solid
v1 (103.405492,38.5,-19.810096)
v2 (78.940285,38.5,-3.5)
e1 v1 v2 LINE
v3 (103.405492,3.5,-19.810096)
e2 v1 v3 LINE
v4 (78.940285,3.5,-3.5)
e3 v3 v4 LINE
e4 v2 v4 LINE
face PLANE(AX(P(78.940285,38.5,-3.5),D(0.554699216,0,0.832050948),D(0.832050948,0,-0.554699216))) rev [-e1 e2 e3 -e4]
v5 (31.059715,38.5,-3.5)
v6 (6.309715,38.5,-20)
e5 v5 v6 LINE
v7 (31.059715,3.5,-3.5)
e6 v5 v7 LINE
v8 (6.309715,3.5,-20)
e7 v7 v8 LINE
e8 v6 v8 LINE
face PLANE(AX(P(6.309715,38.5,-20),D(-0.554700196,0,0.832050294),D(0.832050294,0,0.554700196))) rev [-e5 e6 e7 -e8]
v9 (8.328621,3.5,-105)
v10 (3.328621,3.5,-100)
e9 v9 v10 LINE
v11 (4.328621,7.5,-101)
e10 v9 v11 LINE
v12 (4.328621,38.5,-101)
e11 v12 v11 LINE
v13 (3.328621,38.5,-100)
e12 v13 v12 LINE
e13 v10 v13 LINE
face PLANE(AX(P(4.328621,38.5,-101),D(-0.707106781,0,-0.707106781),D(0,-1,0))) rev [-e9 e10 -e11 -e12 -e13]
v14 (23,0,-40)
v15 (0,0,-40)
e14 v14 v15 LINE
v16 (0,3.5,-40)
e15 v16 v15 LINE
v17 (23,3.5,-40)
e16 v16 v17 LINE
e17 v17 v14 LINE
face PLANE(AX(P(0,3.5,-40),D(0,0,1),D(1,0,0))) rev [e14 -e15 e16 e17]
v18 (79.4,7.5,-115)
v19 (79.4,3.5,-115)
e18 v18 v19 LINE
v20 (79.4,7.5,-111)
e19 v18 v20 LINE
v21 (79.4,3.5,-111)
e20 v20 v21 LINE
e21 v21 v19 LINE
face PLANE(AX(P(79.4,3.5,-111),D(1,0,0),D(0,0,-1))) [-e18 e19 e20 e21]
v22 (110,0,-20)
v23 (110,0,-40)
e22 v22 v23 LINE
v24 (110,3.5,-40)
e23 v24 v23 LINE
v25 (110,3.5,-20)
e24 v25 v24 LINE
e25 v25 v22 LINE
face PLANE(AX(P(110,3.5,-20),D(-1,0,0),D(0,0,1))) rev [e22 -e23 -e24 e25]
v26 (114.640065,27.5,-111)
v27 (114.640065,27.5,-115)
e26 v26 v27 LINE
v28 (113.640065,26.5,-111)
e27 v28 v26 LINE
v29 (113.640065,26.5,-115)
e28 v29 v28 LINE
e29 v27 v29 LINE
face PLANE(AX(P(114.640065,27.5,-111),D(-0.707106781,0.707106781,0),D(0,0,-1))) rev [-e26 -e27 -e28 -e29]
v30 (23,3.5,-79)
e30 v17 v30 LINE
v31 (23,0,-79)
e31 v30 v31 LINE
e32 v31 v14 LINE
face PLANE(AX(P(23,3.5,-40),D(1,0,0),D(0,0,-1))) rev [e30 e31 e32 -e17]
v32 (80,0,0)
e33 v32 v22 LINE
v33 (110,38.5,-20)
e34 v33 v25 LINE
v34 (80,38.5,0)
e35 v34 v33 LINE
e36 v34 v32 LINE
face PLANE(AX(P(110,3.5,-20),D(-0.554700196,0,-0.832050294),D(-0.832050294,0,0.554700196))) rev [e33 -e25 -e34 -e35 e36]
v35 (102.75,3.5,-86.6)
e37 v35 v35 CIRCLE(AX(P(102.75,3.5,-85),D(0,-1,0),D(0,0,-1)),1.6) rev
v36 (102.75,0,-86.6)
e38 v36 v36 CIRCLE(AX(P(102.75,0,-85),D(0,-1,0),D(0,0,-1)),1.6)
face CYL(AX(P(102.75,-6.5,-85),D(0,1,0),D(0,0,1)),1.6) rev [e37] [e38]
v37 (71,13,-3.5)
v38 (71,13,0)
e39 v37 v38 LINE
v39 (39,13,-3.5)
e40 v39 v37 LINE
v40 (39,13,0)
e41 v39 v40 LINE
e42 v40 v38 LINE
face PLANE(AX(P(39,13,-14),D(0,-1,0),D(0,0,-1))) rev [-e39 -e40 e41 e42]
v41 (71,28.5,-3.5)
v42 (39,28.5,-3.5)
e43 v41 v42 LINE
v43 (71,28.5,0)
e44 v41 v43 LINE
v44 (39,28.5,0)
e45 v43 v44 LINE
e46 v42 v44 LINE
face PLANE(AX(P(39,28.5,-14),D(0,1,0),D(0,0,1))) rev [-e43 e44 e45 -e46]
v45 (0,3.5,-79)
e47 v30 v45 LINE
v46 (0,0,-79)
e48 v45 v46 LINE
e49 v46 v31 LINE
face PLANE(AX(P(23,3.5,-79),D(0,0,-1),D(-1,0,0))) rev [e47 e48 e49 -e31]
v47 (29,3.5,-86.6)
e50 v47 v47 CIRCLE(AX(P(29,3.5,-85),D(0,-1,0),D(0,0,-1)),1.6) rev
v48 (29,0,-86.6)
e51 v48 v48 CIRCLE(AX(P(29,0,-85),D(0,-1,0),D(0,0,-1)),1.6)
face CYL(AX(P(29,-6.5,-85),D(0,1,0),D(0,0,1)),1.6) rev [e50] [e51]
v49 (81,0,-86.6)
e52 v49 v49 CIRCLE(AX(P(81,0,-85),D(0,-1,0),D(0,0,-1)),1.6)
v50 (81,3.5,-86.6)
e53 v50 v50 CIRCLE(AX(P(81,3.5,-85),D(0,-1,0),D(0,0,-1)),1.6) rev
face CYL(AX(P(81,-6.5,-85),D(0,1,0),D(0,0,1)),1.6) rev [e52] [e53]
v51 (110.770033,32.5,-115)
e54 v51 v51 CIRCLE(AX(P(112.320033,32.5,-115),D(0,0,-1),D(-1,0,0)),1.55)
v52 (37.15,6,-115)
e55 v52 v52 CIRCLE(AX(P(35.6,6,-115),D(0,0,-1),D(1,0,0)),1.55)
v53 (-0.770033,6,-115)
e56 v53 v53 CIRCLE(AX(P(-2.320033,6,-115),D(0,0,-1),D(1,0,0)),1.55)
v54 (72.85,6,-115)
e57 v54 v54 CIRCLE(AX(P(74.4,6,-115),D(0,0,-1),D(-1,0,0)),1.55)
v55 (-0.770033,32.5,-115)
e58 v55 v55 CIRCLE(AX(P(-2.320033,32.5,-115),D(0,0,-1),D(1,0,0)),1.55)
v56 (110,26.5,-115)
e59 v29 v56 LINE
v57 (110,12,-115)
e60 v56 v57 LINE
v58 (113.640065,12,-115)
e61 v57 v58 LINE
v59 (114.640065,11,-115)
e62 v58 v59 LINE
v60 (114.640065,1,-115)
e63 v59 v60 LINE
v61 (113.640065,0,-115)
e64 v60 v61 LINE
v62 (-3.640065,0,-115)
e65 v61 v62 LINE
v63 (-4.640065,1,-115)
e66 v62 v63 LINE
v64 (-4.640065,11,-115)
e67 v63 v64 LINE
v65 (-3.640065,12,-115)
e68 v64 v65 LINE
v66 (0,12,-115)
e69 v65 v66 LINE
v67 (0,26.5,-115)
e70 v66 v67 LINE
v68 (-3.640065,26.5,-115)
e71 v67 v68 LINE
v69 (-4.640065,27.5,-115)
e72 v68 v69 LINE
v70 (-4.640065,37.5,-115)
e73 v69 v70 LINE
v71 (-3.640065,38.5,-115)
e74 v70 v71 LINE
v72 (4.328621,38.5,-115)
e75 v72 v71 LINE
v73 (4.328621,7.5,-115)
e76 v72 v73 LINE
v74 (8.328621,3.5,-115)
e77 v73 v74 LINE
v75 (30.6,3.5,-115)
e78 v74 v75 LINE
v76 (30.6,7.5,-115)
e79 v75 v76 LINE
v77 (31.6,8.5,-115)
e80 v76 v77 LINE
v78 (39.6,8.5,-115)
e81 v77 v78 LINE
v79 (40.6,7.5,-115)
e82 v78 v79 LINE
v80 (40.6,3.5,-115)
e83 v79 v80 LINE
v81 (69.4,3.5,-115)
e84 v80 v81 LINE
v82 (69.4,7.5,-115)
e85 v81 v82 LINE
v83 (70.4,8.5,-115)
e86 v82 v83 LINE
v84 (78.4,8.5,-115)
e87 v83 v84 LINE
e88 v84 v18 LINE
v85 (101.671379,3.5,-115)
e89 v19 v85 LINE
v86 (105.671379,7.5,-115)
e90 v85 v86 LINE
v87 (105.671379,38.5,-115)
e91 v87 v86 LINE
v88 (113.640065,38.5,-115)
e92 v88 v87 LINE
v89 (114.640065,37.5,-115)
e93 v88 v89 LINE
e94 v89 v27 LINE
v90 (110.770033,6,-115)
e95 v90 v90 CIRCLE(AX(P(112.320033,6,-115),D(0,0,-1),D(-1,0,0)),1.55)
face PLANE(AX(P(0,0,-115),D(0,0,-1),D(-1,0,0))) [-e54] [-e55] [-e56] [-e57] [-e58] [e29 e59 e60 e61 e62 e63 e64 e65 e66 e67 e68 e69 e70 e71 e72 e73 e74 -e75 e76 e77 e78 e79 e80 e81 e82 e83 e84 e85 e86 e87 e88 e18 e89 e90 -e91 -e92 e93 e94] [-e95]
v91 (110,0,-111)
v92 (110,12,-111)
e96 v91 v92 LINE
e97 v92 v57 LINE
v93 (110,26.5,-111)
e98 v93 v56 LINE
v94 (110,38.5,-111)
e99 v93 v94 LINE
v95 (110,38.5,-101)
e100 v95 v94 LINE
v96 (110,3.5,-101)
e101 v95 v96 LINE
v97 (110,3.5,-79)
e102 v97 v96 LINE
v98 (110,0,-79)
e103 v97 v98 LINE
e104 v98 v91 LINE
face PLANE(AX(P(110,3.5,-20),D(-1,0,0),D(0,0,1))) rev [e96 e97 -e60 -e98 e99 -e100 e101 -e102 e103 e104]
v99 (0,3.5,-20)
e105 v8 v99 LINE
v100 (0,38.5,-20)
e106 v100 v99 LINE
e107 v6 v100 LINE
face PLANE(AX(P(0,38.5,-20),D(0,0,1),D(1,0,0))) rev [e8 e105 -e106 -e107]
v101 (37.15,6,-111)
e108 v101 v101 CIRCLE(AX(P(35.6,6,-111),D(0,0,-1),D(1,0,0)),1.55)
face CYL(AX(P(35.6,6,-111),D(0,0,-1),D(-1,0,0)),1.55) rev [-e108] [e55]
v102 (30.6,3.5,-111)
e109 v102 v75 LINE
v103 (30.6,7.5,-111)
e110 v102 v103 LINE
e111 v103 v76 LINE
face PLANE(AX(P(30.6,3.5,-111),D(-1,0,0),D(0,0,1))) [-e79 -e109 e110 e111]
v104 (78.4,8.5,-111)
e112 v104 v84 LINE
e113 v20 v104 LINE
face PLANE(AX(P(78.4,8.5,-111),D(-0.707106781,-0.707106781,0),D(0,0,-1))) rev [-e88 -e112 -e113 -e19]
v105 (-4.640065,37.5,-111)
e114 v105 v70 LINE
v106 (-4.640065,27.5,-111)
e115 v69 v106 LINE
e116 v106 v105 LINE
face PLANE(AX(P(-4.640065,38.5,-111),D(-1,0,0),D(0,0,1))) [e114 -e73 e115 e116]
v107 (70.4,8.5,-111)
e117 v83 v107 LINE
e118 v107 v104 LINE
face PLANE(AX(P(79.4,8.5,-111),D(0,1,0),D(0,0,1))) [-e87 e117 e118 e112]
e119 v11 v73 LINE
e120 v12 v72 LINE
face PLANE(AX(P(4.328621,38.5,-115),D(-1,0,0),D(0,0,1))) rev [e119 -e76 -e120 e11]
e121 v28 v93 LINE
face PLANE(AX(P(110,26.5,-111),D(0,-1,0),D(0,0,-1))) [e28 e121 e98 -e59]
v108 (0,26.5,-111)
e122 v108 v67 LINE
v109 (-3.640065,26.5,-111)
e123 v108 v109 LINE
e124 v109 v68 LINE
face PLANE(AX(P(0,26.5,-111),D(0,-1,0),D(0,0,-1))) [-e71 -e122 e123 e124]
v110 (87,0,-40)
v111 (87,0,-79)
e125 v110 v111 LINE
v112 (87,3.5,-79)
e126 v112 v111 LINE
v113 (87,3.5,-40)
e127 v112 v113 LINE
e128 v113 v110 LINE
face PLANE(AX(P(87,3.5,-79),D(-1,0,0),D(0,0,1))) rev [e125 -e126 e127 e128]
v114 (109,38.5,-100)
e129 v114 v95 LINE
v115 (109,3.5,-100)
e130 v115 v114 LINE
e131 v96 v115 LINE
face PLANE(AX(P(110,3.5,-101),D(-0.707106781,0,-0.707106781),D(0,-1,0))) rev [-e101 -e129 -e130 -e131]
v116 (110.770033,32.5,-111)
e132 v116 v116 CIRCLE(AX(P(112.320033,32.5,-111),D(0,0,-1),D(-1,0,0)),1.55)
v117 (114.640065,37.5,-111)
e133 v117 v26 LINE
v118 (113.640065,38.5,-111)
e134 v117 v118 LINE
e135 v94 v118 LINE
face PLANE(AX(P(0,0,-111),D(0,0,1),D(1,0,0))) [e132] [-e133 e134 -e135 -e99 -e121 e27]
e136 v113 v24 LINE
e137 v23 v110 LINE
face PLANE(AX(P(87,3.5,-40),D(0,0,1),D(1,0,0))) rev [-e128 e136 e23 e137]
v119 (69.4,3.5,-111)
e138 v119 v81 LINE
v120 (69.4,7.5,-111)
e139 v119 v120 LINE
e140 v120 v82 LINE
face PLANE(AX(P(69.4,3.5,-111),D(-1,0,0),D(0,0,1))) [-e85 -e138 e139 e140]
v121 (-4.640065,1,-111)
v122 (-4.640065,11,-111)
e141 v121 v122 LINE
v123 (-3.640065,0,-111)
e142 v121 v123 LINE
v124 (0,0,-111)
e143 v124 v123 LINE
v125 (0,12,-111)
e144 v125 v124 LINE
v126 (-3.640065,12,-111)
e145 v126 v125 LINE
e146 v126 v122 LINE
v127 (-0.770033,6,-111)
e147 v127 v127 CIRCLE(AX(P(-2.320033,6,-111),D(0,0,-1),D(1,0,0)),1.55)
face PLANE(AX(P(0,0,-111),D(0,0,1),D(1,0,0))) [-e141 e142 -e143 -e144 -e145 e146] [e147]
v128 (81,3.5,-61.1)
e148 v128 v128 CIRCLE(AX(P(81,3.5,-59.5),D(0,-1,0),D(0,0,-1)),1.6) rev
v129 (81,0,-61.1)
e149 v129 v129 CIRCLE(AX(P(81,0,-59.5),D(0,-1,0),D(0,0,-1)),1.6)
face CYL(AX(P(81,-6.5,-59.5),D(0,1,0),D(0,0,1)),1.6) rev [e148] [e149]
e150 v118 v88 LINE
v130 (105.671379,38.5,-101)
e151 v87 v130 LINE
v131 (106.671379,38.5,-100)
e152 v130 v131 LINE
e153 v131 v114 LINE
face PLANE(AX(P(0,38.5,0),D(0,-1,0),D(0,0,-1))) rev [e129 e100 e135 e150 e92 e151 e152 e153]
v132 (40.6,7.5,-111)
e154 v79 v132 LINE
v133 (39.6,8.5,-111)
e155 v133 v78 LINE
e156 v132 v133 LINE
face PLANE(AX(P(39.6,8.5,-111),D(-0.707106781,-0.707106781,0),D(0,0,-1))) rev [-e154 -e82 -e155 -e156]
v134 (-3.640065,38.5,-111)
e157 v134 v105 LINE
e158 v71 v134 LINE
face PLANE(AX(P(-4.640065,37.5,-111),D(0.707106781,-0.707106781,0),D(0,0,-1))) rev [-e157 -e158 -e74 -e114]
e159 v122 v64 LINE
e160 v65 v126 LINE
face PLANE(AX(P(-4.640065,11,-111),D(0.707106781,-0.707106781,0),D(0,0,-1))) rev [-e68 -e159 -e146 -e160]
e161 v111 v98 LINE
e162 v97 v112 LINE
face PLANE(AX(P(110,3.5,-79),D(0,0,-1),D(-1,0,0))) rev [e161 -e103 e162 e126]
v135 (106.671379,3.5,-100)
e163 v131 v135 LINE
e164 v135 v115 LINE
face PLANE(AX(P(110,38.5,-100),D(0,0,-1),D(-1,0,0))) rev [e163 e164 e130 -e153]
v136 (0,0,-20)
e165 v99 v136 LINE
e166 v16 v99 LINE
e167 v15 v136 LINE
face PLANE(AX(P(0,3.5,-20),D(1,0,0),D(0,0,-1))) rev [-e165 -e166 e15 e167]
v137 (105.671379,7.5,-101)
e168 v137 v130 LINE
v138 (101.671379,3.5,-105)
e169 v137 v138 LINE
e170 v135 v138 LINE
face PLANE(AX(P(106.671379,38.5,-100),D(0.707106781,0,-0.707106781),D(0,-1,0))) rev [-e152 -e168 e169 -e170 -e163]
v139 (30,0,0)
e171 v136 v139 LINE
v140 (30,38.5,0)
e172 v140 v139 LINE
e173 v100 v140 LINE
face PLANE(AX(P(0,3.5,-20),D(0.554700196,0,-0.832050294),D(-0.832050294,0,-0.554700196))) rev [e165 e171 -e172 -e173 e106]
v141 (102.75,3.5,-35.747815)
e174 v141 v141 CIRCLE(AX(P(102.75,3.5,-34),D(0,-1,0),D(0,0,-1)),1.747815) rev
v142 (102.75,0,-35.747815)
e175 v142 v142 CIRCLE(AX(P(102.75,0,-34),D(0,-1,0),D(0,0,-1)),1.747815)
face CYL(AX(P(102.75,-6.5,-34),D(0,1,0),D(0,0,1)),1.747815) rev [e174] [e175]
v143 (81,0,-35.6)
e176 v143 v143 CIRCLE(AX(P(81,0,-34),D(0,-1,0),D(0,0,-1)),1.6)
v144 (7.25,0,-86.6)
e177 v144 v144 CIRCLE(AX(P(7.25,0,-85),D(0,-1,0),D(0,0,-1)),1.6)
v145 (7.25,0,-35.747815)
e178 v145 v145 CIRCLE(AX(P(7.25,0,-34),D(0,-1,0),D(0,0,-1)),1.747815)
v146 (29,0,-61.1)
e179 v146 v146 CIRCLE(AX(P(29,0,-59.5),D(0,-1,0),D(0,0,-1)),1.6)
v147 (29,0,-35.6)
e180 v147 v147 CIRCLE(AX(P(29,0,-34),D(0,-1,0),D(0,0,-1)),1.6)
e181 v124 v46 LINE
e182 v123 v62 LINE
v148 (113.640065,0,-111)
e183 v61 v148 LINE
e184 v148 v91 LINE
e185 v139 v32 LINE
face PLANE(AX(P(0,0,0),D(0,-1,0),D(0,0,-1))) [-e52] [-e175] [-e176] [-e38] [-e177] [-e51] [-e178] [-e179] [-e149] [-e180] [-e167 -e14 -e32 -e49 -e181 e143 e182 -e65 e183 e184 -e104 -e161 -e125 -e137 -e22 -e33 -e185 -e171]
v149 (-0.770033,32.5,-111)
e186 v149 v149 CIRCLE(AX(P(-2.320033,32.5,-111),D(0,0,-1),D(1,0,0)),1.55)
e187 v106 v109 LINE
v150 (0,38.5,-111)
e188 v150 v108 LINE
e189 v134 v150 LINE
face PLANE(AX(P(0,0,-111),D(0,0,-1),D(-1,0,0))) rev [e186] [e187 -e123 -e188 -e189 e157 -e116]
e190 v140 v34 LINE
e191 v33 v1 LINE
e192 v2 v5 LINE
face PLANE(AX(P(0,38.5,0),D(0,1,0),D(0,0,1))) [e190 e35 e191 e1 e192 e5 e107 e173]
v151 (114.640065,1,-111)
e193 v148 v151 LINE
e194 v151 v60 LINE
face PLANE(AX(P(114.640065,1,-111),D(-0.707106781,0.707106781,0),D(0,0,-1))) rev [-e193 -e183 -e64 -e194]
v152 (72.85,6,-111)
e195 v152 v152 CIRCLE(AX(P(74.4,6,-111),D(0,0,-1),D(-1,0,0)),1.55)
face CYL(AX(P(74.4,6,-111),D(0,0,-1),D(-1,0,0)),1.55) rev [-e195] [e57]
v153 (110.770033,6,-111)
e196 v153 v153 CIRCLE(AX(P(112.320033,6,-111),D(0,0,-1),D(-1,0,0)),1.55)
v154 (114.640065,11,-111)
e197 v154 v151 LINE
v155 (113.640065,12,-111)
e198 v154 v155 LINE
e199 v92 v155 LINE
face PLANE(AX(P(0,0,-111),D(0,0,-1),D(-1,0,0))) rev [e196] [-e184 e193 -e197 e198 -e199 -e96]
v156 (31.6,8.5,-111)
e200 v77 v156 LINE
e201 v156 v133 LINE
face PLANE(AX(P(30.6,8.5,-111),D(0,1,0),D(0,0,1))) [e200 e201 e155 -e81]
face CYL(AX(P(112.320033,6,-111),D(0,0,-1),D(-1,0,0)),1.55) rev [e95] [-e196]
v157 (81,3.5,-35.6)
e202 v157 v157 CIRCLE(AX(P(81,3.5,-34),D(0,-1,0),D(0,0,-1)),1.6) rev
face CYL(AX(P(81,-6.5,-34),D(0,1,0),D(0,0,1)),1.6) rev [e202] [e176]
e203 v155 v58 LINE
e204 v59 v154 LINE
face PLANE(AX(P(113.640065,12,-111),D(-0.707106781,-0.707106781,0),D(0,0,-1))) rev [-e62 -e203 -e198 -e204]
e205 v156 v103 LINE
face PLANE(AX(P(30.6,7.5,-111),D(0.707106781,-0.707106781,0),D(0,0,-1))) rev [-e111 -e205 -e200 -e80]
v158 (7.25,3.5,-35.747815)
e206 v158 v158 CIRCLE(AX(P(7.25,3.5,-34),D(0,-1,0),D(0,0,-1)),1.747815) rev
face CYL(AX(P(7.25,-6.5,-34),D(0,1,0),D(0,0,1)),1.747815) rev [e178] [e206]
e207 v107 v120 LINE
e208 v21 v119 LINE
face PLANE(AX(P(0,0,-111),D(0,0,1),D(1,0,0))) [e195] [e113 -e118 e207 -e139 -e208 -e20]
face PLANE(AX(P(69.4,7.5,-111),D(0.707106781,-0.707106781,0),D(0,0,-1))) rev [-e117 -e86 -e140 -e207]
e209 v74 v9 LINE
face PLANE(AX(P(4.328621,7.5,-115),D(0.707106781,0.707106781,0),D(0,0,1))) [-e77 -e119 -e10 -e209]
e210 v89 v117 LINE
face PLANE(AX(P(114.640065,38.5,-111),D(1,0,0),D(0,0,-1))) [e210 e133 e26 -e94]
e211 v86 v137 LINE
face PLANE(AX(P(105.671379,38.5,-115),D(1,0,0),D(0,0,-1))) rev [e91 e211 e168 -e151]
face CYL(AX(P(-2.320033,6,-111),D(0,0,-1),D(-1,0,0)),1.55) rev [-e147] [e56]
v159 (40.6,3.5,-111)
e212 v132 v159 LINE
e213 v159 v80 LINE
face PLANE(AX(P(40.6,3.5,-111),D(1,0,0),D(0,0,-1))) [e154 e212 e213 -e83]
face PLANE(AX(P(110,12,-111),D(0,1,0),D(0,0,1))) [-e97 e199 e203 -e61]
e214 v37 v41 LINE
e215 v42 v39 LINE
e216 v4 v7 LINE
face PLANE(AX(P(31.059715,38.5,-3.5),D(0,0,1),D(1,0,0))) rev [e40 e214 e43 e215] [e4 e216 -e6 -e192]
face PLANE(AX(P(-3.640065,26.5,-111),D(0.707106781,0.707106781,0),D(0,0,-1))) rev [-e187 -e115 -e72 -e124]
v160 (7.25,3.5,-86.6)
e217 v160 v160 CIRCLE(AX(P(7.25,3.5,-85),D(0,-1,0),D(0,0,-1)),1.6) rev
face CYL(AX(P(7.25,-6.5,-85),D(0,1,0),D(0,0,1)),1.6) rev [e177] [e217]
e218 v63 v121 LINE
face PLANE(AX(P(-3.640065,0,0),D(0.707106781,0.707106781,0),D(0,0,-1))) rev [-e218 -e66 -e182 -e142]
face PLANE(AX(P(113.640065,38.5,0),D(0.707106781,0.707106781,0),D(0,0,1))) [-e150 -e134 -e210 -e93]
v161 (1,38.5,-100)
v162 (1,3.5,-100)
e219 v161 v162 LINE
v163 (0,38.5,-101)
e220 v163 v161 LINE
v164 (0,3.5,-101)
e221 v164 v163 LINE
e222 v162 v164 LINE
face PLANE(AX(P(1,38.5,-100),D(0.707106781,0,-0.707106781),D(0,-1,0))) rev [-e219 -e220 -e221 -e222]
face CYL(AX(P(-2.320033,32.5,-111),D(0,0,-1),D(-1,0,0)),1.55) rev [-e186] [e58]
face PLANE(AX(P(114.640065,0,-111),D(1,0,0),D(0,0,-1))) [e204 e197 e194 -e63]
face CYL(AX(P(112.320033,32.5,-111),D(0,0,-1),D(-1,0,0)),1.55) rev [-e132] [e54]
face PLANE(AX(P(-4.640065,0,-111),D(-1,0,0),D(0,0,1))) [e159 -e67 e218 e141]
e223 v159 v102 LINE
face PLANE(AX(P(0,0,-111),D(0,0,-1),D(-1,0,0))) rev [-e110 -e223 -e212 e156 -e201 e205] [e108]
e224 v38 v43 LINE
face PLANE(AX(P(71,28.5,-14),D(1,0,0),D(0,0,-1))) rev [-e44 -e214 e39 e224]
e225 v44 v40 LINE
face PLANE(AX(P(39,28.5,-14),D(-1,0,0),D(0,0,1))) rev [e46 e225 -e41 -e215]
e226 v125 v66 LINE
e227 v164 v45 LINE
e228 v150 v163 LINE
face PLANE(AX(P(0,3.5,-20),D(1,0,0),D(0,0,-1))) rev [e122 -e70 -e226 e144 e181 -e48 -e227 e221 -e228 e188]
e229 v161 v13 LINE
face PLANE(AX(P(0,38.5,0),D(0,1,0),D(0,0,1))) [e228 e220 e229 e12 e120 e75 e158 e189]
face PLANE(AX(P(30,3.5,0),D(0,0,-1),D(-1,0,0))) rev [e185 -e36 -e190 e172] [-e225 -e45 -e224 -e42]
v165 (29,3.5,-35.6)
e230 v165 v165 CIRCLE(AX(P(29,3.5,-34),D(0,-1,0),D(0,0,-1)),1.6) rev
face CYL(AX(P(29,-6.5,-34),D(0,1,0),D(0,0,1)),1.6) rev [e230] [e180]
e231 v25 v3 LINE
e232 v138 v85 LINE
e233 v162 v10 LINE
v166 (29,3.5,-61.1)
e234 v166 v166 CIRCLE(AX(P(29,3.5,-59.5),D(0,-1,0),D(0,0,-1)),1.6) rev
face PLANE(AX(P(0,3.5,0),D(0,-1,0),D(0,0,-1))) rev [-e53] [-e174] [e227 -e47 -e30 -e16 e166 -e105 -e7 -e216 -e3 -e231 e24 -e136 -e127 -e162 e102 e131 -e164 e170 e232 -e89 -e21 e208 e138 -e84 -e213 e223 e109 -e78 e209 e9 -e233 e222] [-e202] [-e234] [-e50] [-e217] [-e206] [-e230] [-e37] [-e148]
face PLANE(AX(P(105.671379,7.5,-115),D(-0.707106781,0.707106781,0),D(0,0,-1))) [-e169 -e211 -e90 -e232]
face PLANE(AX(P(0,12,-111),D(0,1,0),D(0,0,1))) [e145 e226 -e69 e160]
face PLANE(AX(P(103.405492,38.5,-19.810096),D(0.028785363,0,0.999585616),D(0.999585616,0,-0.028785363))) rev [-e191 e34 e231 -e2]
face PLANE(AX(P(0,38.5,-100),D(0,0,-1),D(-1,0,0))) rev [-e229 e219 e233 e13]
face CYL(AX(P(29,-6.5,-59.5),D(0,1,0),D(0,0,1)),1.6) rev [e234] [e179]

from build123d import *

# Parameters (mm, degrees)
BOSS_EXTRUDE1_DEPTH  = 3.5
BOSS_EXTRUDE2_DEPTH  = 21
SKETCH3_W            = 23
SKETCH3_H            = 39
BOSS_EXTRUDE3_DEPTH  = 2.5
SKETCH5_W            = 21.5
SKETCH5_H            = 25
SKETCH5_W_2          = 7.07
SKETCH5_H_2          = 19.04
BOSS_EXTRUDE5_DEPTH  = 2.5
SKETCH6_W            = 7.07
SKETCH6_H            = 5.9
BOSS_EXTRUDE6_DEPTH  = 20
BOSS_EXTRUDE7_DEPTH  = 23
FILLET1_SIZE         = 10
SKETCH9_R            = 2.475
BOSS_EXTRUDE8_DEPTH  = 9
FILLET2_R            = 0.5
SKETCH10_R           = 1.65
CUT_EXTRUDE1_DEPTH   = 9
SKETCH11_W           = 0.2
SKETCH11_H           = 20
CUT_EXTRUDE2_DEPTH   = 9
CUT_EXTRUDE3_DEPTH   = 9
FILLET3_SIZE         = 3
BOSS_EXTRUDE9_DEPTH  = 5
SKETCH14_R           = 1.747814763
SKETCH14_R_2         = 1.6
CUT_EXTRUDE4_DEPTH   = 15
BOSS_EXTRUDE10_DEPTH = 35
SKETCH17_W           = 110
SKETCH17_H           = 3.5
BOSS_EXTRUDE11_DEPTH = 15
SKETCH18_W           = 161.485932181
SKETCH18_H           = 44
CUT_EXTRUDE5_DEPTH   = 63
SKETCH19_W           = 4.328620931
SKETCH19_H           = 15
BOSS_EXTRUDE12_DEPTH = 35
FILLET4_SIZE         = 1
SKETCH20_W           = 4.640065176
SKETCH20_H           = 12
SKETCH20_R           = 1.55
SKETCH20_W_2         = 10
SKETCH20_H_2         = 5
BOSS_EXTRUDE13_DEPTH = 4
SKETCH21_W           = 32
SKETCH21_H           = 15.5
CUT_EXTRUDE6_DEPTH   = 14
FILLET5_SIZE         = 1
FILLET6_SIZE         = 4


with BuildPart() as part:
    # Sketch1 → Boss-Extrude1 (new body)
    with BuildSketch(Plane(origin=(0, 0, 0), x_dir=(1, 0, 0), z_dir=(0, 1, 0))):
        Polygon((0, 40), (23, 40), (23, 79), (0, 79), (0, 100), (110, 100), (110, 79), (87, 79), (87, 40), (110, 40), (110, 20), (80, 0), (30, 0), (0, 20), align=None)
    extrude(amount=BOSS_EXTRUDE1_DEPTH)

    # Sketch2 → Boss-Extrude2 (add)
    with BuildSketch(Plane(origin=(0, 3.5, 0), x_dir=(1, 0, 0), z_dir=(0, 1, 0))):
        Polygon((0, 79), (23, 79), (23, 40), (0, 40), (0, 37.5), (25.5, 37.5), (25.5, 81.5), (0, 81.5), align=None)
        Polygon((110, 81.5), (84.5, 81.5), (84.5, 37.5), (110, 37.5), (110, 40), (87, 40), (87, 79), (110, 79), align=None)
    extrude(amount=BOSS_EXTRUDE2_DEPTH)

    # Sketch3 → Boss-Extrude3 (add)
    with BuildSketch(Plane(origin=(0, 24.5, 0), x_dir=(1, 0, 0), z_dir=(0, 1, 0))):
        with Locations((11.5, 59.5)):
            Rectangle(SKETCH3_W, SKETCH3_H)
        with Locations((98.5, 59.5)):
            Rectangle(SKETCH3_W, SKETCH3_H)
    extrude(amount=-BOSS_EXTRUDE3_DEPTH)

    # Sketch5 → Boss-Extrude5 (add)
    with BuildSketch(Plane(origin=(0, 24.5, 0), x_dir=(1, 0, 0), z_dir=(0, 1, 0))):
        with Locations((120.75, 50)):
            Rectangle(SKETCH5_W, SKETCH5_H)
        with Locations((-10.75, 50)):
            Rectangle(SKETCH5_W, SKETCH5_H)
        with Locations((29.035, 47.02)):
            Rectangle(SKETCH5_W_2, SKETCH5_H_2)
        with Locations((80.965, 47.02)):
            Rectangle(SKETCH5_W_2, SKETCH5_H_2)
    extrude(amount=-BOSS_EXTRUDE5_DEPTH)

    # Sketch6 → Boss-Extrude6 (add)
    with BuildSketch(Plane(origin=(0, 24.5, 0), x_dir=(1, 0, 0), z_dir=(0, 1, 0))):
        with Locations((29.035, 53.59)):
            Rectangle(SKETCH6_W, SKETCH6_H)
        with Locations((80.965, 53.59)):
            Rectangle(SKETCH6_W, SKETCH6_H)
        with Locations((-17.965, 53.59)):
            Rectangle(SKETCH6_W, SKETCH6_H)
        with Locations((127.965, 53.59)):
            Rectangle(SKETCH6_W, SKETCH6_H)
    extrude(amount=BOSS_EXTRUDE6_DEPTH)

    # Sketch7 → Boss-Extrude7 (add)
    with BuildSketch(Plane(origin=(0, 24.5, 0), x_dir=(1, 0, 0), z_dir=(0, 1, 0))):
        Polygon((0, 81.5), (25.5, 81.5), (25.5, 79), (0, 79), (-21.5, 79), (-21.5, 81.5), align=None)
        Polygon((110, 79), (84.5, 79), (84.5, 81.5), (110, 81.5), (131.5, 81.5), (131.5, 79), align=None)
    extrude(amount=BOSS_EXTRUDE7_DEPTH)

    # Fillet1
    # the kernel refuses this chamfer: 10 mm, written as the material it adds along each edge
    with BuildSketch(Plane(origin=(0, 22, -40), x_dir=(0.027495876610586372, -0.9996219169112968, 0), z_dir=(0, 0, 1)), Plane(origin=(110, 22, -37.5), x_dir=(-0.027495876610586317, -0.9996219169112968, 0), z_dir=(0, 0, -1)), Plane(origin=(110, 24.5, -81.5), x_dir=(0.9996219169112968, 0.027495876610586317, 0), z_dir=(0, 0, 1))) as fillet1_piece_1:
        Polygon((FILLET1_SIZE * 0.999621916911, -FILLET1_SIZE * 0.0274958766106), (-FILLET1_SIZE * 0.0274958766106, -FILLET1_SIZE * 0.999621916911), (0, 0), align=None)
    extrude(amount=2.5)
    with BuildSketch(Plane(origin=(0, 24.5, -79), x_dir=(0.027495876610586372, -0.9996219169112968, 0), z_dir=(0, 0, -1))) as fillet1_piece_2:
        Polygon((FILLET1_SIZE * 0.999621916911, FILLET1_SIZE * 0.0274958766106), (-FILLET1_SIZE * 0.0274958766106, FILLET1_SIZE * 0.999621916911), (0, 0), align=None)
    extrude(amount=2.5)

    # Sketch9 → Boss-Extrude8 (add)
    with BuildSketch(Plane(origin=(0, 0, -81.5), x_dir=(-1, 0, 0), z_dir=(0, 0, -1))):
        with Locations(Location((-114.55, 34.35, 0), (0, 0, 180))):
            Circle(SKETCH9_R)
        with Locations(Location((4.55, 34.35, 0), (0, 0, 180))):
            Circle(SKETCH9_R)
    extrude(amount=BOSS_EXTRUDE8_DEPTH)

    # Fillet2
    fillet2_edges = [part.edges().sort_by_distance(p)[0] for p in [
        (112.075, 34.35, -90.5),
        (-7.025, 34.35, -90.5),
    ]]
    fillet(fillet2_edges, radius=FILLET2_R)

    # Sketch10 → Cut-Extrude1 (cut)
    with BuildSketch(Plane.XY.offset(-50.64)):
        with Locations((129.16, 39.27)):
            Circle(SKETCH10_R)
        with Locations((129.16, 29.43)):
            Circle(SKETCH10_R)
        with Locations((79.77, 39.27)):
            Circle(SKETCH10_R)
        with Locations((79.77, 29.43)):
            Circle(SKETCH10_R)
        with Locations((-19.16, 29.43)):
            Circle(SKETCH10_R)
        with Locations((-19.16, 39.27)):
            Circle(SKETCH10_R)
        with Locations(Location((30.23, 39.27, 0), (0, 0, 180))):
            Circle(SKETCH10_R)
        with Locations(Location((30.23, 29.43, 0), (0, 0, 180))):
            Circle(SKETCH10_R)
    extrude(amount=-CUT_EXTRUDE1_DEPTH, mode=Mode.SUBTRACT)

    # Sketch11 → Cut-Extrude2 (cut)
    with BuildSketch(Plane.XY.offset(-50.64)):
        with Locations((-14.53, 34.5)):
            Rectangle(SKETCH11_W, SKETCH11_H)
        with Locations((25.6, 34.5)):
            Rectangle(SKETCH11_W, SKETCH11_H)
        with Locations((84.4, 34.5)):
            Rectangle(SKETCH11_W, SKETCH11_H)
        with Locations((124.53, 34.5)):
            Rectangle(SKETCH11_W, SKETCH11_H)
    extrude(amount=-CUT_EXTRUDE2_DEPTH, mode=Mode.SUBTRACT)

    # Sketch12 → Cut-Extrude3 (cut)
    with BuildSketch(Plane(origin=(0, 0, -81.5), x_dir=(-1, 0, 0), z_dir=(0, 0, -1))):
        Polygon((-108, 47.5), (-84.5, 25.5), (-84.5, 47.5), align=None)
        Polygon((-25.5, 25.5), (-25.5, 47.5), (-2, 47.5), align=None)
        Polygon((-120, 24.5), (-131.5, 36), (-131.5, 24.5), align=None)
        Polygon((10, 24.5), (21.5, 36), (21.5, 24.5), align=None)
    extrude(amount=-CUT_EXTRUDE3_DEPTH, mode=Mode.SUBTRACT)

    # Fillet3
    fillet3_edges = [part.edges().sort_by_distance(p)[0] for p in [
        (0, 23.25, -62.5),
        (110, 23.25, -62.5),
    ]]
    chamfer(fillet3_edges, length=FILLET3_SIZE)

    # Sketch13 → Boss-Extrude9 (add)
    with BuildSketch(Plane(origin=(0, 3.5, 0), x_dir=(1, 0, 0), z_dir=(0, 1, 0))):
        Polygon((0, 30.5), (32.5, 30.5), (32.5, 88.5), (0, 88.5), (0, 81.5), (25.5, 81.5), (25.5, 37.5), (0, 37.5), align=None)
        Polygon((84.5, 37.5), (110, 37.5), (110, 30.5), (77.5, 30.5), (77.5, 88.5), (110, 88.5), (110, 81.5), (84.5, 81.5), align=None)
    extrude(amount=BOSS_EXTRUDE9_DEPTH)

    # Sketch14 → Cut-Extrude4 (cut)
    with BuildSketch(Plane(origin=(0, 8.5, 0), x_dir=(1, 0, 0), z_dir=(0, 1, 0))):
        with Locations(Location((7.25, 34, 0), (0, 0, 270))):
            Circle(SKETCH14_R)
        with Locations(Location((7.25, 85, 0), (0, 0, 270))):
            Circle(SKETCH14_R_2)
        with Locations(Location((29, 34, 0), (0, 0, 270))):
            Circle(SKETCH14_R_2)
        with Locations(Location((29, 59.5, 0), (0, 0, 270))):
            Circle(SKETCH14_R_2)
        with Locations(Location((29, 85, 0), (0, 0, 270))):
            Circle(SKETCH14_R_2)
        with Locations(Location((81, 34, 0), (0, 0, 90))):
            Circle(SKETCH14_R_2)
        with Locations(Location((102.75, 34, 0), (0, 0, 90))):
            Circle(SKETCH14_R)
        with Locations(Location((81, 59.5, 0), (0, 0, 90))):
            Circle(SKETCH14_R_2)
        with Locations(Location((81, 85, 0), (0, 0, 90))):
            Circle(SKETCH14_R_2)
        with Locations(Location((102.75, 85, 0), (0, 0, 90))):
            Circle(SKETCH14_R_2)
    extrude(amount=-CUT_EXTRUDE4_DEPTH, mode=Mode.SUBTRACT)

    # Sketch15 → Boss-Extrude10 (add)
    with BuildSketch(Plane(origin=(0, 3.5, 0), x_dir=(1, 0, 0), z_dir=(0, 1, 0))):
        Polygon((110, 20), (80, 0), (30, 0), (0, 20), (6.309714732, 20), (31.059714732, 3.5), (78.940285268, 3.5), (103.405491726, 19.81009599), align=None)
    extrude(amount=BOSS_EXTRUDE10_DEPTH)

    # Sketch17 → Boss-Extrude11 (add)
    with BuildSketch(Plane(origin=(0, 0, -100), x_dir=(-1, 0, 0), z_dir=(0, 0, -1))):
        with Locations((-55, 1.75)):
            Rectangle(SKETCH17_W, SKETCH17_H)
    extrude(amount=BOSS_EXTRUDE11_DEPTH)

    # Sketch18 → Cut-Extrude5 (cut)
    with BuildSketch(Plane(origin=(0, 0, -88.5), x_dir=(-1, 0, 0), z_dir=(0, 0, -1))):
        with Locations((-59.242966091, 25.5)):
            Rectangle(SKETCH18_W, SKETCH18_H)
    extrude(amount=-CUT_EXTRUDE5_DEPTH, mode=Mode.SUBTRACT)


with BuildPart() as body_2:
    # of the pieces the cut leaves, the one that is kept (cut_extrude5_keep)
    add(part.part.solids().sort_by_distance((0, 3.5, -79))[0])

    # Sketch19 → Boss-Extrude12 (add)
    with BuildSketch(Plane(origin=(0, 3.5, 0), x_dir=(1, 0, 0), z_dir=(0, 1, 0))):
        with Locations((107.835689535, 107.5)):
            Rectangle(SKETCH19_W, SKETCH19_H)
        with Locations((2.164310466, 107.5)):
            Rectangle(SKETCH19_W, SKETCH19_H)
    extrude(amount=BOSS_EXTRUDE12_DEPTH)

    # Fillet4
    fillet4_edges = [body_2.edges().sort_by_distance(p)[0] for p in [
        (0, 21, -100),
        (4.328620931, 21, -100),
        (110, 21, -100),
        (105.671379069, 21, -100),
    ]]
    chamfer(fillet4_edges, length=FILLET4_SIZE)

    # Sketch20 → Boss-Extrude13 (add)
    # profile 1 of 6: a face of its own
    with BuildSketch(Plane(origin=(0, 0, -115), x_dir=(-1, 0, 0), z_dir=(0, 0, -1))):
        with Locations((-112.320032588, 32.5)):
            Rectangle(SKETCH20_W, SKETCH20_H)
        with Locations((-112.320032588, 32.5)):
            Circle(SKETCH20_R, mode=Mode.SUBTRACT)
    # profile 2 of 6: a face of its own
    with BuildSketch(Plane(origin=(0, 0, -115), x_dir=(-1, 0, 0), z_dir=(0, 0, -1))):
        with Locations((-112.320032588, 6)):
            Rectangle(SKETCH20_W, SKETCH20_H)
        with Locations((-112.320032588, 6)):
            Circle(SKETCH20_R, mode=Mode.SUBTRACT)
    # profile 3 of 6: a face of its own
    with BuildSketch(Plane(origin=(0, 0, -115), x_dir=(-1, 0, 0), z_dir=(0, 0, -1))):
        with Locations((2.320032588, 6)):
            Rectangle(SKETCH20_W, SKETCH20_H)
        with Locations(Location((2.320032588, 6, 0), (0, 0, 180))):
            Circle(SKETCH20_R, mode=Mode.SUBTRACT)
    # profile 4 of 6: a face of its own
    with BuildSketch(Plane(origin=(0, 0, -115), x_dir=(-1, 0, 0), z_dir=(0, 0, -1))):
        with Locations((2.320032588, 32.5)):
            Rectangle(SKETCH20_W, SKETCH20_H)
        with Locations(Location((2.320032588, 32.5, 0), (0, 0, 180))):
            Circle(SKETCH20_R, mode=Mode.SUBTRACT)
    # profile 5 of 6: a face of its own
    with BuildSketch(Plane(origin=(0, 0, -115), x_dir=(-1, 0, 0), z_dir=(0, 0, -1))):
        with Locations((-74.4, 6)):
            Rectangle(SKETCH20_W_2, SKETCH20_H_2)
        with Locations((-74.4, 6)):
            Circle(SKETCH20_R, mode=Mode.SUBTRACT)
    # profile 6 of 6: a face of its own
    with BuildSketch(Plane(origin=(0, 0, -115), x_dir=(-1, 0, 0), z_dir=(0, 0, -1))):
        with Locations((-35.6, 6)):
            Rectangle(SKETCH20_W_2, SKETCH20_H_2)
        with Locations(Location((-35.6, 6, 0), (0, 0, 180))):
            Circle(SKETCH20_R, mode=Mode.SUBTRACT)
    extrude(amount=-BOSS_EXTRUDE13_DEPTH)

    # Sketch21 → Cut-Extrude6 (cut)
    with BuildSketch(Plane.XY):
        with Locations((55, 20.75)):
            Rectangle(SKETCH21_W, SKETCH21_H)
    extrude(amount=-CUT_EXTRUDE6_DEPTH, mode=Mode.SUBTRACT)

    # Fillet5
    fillet5_edges = [body_2.edges().sort_by_distance(p)[0] for p in [
        (114.640065176, 26.5, -113),
        (114.640065176, 38.5, -113),
        (114.640065176, 0, -113),
        (114.640065176, 12, -113),
        (-4.640065176, 12, -113),
        (-4.640065176, 0, -113),
        (-4.640065176, 38.5, -113),
        (-4.640065176, 26.5, -113),
        (79.4, 8.5, -113),
        (69.4, 8.5, -113),
        (30.6, 8.5, -113),
        (40.6, 8.5, -113),
    ]]
    chamfer(fillet5_edges, length=FILLET5_SIZE)

    # Fillet6
    fillet6_edges = [body_2.edges().sort_by_distance(p)[0] for p in [
        (105.671379069, 3.5, -108),
        (4.328620931, 3.5, -108),
    ]]
    chamfer(fillet6_edges, length=FILLET6_SIZE)


solid = body_2.part
